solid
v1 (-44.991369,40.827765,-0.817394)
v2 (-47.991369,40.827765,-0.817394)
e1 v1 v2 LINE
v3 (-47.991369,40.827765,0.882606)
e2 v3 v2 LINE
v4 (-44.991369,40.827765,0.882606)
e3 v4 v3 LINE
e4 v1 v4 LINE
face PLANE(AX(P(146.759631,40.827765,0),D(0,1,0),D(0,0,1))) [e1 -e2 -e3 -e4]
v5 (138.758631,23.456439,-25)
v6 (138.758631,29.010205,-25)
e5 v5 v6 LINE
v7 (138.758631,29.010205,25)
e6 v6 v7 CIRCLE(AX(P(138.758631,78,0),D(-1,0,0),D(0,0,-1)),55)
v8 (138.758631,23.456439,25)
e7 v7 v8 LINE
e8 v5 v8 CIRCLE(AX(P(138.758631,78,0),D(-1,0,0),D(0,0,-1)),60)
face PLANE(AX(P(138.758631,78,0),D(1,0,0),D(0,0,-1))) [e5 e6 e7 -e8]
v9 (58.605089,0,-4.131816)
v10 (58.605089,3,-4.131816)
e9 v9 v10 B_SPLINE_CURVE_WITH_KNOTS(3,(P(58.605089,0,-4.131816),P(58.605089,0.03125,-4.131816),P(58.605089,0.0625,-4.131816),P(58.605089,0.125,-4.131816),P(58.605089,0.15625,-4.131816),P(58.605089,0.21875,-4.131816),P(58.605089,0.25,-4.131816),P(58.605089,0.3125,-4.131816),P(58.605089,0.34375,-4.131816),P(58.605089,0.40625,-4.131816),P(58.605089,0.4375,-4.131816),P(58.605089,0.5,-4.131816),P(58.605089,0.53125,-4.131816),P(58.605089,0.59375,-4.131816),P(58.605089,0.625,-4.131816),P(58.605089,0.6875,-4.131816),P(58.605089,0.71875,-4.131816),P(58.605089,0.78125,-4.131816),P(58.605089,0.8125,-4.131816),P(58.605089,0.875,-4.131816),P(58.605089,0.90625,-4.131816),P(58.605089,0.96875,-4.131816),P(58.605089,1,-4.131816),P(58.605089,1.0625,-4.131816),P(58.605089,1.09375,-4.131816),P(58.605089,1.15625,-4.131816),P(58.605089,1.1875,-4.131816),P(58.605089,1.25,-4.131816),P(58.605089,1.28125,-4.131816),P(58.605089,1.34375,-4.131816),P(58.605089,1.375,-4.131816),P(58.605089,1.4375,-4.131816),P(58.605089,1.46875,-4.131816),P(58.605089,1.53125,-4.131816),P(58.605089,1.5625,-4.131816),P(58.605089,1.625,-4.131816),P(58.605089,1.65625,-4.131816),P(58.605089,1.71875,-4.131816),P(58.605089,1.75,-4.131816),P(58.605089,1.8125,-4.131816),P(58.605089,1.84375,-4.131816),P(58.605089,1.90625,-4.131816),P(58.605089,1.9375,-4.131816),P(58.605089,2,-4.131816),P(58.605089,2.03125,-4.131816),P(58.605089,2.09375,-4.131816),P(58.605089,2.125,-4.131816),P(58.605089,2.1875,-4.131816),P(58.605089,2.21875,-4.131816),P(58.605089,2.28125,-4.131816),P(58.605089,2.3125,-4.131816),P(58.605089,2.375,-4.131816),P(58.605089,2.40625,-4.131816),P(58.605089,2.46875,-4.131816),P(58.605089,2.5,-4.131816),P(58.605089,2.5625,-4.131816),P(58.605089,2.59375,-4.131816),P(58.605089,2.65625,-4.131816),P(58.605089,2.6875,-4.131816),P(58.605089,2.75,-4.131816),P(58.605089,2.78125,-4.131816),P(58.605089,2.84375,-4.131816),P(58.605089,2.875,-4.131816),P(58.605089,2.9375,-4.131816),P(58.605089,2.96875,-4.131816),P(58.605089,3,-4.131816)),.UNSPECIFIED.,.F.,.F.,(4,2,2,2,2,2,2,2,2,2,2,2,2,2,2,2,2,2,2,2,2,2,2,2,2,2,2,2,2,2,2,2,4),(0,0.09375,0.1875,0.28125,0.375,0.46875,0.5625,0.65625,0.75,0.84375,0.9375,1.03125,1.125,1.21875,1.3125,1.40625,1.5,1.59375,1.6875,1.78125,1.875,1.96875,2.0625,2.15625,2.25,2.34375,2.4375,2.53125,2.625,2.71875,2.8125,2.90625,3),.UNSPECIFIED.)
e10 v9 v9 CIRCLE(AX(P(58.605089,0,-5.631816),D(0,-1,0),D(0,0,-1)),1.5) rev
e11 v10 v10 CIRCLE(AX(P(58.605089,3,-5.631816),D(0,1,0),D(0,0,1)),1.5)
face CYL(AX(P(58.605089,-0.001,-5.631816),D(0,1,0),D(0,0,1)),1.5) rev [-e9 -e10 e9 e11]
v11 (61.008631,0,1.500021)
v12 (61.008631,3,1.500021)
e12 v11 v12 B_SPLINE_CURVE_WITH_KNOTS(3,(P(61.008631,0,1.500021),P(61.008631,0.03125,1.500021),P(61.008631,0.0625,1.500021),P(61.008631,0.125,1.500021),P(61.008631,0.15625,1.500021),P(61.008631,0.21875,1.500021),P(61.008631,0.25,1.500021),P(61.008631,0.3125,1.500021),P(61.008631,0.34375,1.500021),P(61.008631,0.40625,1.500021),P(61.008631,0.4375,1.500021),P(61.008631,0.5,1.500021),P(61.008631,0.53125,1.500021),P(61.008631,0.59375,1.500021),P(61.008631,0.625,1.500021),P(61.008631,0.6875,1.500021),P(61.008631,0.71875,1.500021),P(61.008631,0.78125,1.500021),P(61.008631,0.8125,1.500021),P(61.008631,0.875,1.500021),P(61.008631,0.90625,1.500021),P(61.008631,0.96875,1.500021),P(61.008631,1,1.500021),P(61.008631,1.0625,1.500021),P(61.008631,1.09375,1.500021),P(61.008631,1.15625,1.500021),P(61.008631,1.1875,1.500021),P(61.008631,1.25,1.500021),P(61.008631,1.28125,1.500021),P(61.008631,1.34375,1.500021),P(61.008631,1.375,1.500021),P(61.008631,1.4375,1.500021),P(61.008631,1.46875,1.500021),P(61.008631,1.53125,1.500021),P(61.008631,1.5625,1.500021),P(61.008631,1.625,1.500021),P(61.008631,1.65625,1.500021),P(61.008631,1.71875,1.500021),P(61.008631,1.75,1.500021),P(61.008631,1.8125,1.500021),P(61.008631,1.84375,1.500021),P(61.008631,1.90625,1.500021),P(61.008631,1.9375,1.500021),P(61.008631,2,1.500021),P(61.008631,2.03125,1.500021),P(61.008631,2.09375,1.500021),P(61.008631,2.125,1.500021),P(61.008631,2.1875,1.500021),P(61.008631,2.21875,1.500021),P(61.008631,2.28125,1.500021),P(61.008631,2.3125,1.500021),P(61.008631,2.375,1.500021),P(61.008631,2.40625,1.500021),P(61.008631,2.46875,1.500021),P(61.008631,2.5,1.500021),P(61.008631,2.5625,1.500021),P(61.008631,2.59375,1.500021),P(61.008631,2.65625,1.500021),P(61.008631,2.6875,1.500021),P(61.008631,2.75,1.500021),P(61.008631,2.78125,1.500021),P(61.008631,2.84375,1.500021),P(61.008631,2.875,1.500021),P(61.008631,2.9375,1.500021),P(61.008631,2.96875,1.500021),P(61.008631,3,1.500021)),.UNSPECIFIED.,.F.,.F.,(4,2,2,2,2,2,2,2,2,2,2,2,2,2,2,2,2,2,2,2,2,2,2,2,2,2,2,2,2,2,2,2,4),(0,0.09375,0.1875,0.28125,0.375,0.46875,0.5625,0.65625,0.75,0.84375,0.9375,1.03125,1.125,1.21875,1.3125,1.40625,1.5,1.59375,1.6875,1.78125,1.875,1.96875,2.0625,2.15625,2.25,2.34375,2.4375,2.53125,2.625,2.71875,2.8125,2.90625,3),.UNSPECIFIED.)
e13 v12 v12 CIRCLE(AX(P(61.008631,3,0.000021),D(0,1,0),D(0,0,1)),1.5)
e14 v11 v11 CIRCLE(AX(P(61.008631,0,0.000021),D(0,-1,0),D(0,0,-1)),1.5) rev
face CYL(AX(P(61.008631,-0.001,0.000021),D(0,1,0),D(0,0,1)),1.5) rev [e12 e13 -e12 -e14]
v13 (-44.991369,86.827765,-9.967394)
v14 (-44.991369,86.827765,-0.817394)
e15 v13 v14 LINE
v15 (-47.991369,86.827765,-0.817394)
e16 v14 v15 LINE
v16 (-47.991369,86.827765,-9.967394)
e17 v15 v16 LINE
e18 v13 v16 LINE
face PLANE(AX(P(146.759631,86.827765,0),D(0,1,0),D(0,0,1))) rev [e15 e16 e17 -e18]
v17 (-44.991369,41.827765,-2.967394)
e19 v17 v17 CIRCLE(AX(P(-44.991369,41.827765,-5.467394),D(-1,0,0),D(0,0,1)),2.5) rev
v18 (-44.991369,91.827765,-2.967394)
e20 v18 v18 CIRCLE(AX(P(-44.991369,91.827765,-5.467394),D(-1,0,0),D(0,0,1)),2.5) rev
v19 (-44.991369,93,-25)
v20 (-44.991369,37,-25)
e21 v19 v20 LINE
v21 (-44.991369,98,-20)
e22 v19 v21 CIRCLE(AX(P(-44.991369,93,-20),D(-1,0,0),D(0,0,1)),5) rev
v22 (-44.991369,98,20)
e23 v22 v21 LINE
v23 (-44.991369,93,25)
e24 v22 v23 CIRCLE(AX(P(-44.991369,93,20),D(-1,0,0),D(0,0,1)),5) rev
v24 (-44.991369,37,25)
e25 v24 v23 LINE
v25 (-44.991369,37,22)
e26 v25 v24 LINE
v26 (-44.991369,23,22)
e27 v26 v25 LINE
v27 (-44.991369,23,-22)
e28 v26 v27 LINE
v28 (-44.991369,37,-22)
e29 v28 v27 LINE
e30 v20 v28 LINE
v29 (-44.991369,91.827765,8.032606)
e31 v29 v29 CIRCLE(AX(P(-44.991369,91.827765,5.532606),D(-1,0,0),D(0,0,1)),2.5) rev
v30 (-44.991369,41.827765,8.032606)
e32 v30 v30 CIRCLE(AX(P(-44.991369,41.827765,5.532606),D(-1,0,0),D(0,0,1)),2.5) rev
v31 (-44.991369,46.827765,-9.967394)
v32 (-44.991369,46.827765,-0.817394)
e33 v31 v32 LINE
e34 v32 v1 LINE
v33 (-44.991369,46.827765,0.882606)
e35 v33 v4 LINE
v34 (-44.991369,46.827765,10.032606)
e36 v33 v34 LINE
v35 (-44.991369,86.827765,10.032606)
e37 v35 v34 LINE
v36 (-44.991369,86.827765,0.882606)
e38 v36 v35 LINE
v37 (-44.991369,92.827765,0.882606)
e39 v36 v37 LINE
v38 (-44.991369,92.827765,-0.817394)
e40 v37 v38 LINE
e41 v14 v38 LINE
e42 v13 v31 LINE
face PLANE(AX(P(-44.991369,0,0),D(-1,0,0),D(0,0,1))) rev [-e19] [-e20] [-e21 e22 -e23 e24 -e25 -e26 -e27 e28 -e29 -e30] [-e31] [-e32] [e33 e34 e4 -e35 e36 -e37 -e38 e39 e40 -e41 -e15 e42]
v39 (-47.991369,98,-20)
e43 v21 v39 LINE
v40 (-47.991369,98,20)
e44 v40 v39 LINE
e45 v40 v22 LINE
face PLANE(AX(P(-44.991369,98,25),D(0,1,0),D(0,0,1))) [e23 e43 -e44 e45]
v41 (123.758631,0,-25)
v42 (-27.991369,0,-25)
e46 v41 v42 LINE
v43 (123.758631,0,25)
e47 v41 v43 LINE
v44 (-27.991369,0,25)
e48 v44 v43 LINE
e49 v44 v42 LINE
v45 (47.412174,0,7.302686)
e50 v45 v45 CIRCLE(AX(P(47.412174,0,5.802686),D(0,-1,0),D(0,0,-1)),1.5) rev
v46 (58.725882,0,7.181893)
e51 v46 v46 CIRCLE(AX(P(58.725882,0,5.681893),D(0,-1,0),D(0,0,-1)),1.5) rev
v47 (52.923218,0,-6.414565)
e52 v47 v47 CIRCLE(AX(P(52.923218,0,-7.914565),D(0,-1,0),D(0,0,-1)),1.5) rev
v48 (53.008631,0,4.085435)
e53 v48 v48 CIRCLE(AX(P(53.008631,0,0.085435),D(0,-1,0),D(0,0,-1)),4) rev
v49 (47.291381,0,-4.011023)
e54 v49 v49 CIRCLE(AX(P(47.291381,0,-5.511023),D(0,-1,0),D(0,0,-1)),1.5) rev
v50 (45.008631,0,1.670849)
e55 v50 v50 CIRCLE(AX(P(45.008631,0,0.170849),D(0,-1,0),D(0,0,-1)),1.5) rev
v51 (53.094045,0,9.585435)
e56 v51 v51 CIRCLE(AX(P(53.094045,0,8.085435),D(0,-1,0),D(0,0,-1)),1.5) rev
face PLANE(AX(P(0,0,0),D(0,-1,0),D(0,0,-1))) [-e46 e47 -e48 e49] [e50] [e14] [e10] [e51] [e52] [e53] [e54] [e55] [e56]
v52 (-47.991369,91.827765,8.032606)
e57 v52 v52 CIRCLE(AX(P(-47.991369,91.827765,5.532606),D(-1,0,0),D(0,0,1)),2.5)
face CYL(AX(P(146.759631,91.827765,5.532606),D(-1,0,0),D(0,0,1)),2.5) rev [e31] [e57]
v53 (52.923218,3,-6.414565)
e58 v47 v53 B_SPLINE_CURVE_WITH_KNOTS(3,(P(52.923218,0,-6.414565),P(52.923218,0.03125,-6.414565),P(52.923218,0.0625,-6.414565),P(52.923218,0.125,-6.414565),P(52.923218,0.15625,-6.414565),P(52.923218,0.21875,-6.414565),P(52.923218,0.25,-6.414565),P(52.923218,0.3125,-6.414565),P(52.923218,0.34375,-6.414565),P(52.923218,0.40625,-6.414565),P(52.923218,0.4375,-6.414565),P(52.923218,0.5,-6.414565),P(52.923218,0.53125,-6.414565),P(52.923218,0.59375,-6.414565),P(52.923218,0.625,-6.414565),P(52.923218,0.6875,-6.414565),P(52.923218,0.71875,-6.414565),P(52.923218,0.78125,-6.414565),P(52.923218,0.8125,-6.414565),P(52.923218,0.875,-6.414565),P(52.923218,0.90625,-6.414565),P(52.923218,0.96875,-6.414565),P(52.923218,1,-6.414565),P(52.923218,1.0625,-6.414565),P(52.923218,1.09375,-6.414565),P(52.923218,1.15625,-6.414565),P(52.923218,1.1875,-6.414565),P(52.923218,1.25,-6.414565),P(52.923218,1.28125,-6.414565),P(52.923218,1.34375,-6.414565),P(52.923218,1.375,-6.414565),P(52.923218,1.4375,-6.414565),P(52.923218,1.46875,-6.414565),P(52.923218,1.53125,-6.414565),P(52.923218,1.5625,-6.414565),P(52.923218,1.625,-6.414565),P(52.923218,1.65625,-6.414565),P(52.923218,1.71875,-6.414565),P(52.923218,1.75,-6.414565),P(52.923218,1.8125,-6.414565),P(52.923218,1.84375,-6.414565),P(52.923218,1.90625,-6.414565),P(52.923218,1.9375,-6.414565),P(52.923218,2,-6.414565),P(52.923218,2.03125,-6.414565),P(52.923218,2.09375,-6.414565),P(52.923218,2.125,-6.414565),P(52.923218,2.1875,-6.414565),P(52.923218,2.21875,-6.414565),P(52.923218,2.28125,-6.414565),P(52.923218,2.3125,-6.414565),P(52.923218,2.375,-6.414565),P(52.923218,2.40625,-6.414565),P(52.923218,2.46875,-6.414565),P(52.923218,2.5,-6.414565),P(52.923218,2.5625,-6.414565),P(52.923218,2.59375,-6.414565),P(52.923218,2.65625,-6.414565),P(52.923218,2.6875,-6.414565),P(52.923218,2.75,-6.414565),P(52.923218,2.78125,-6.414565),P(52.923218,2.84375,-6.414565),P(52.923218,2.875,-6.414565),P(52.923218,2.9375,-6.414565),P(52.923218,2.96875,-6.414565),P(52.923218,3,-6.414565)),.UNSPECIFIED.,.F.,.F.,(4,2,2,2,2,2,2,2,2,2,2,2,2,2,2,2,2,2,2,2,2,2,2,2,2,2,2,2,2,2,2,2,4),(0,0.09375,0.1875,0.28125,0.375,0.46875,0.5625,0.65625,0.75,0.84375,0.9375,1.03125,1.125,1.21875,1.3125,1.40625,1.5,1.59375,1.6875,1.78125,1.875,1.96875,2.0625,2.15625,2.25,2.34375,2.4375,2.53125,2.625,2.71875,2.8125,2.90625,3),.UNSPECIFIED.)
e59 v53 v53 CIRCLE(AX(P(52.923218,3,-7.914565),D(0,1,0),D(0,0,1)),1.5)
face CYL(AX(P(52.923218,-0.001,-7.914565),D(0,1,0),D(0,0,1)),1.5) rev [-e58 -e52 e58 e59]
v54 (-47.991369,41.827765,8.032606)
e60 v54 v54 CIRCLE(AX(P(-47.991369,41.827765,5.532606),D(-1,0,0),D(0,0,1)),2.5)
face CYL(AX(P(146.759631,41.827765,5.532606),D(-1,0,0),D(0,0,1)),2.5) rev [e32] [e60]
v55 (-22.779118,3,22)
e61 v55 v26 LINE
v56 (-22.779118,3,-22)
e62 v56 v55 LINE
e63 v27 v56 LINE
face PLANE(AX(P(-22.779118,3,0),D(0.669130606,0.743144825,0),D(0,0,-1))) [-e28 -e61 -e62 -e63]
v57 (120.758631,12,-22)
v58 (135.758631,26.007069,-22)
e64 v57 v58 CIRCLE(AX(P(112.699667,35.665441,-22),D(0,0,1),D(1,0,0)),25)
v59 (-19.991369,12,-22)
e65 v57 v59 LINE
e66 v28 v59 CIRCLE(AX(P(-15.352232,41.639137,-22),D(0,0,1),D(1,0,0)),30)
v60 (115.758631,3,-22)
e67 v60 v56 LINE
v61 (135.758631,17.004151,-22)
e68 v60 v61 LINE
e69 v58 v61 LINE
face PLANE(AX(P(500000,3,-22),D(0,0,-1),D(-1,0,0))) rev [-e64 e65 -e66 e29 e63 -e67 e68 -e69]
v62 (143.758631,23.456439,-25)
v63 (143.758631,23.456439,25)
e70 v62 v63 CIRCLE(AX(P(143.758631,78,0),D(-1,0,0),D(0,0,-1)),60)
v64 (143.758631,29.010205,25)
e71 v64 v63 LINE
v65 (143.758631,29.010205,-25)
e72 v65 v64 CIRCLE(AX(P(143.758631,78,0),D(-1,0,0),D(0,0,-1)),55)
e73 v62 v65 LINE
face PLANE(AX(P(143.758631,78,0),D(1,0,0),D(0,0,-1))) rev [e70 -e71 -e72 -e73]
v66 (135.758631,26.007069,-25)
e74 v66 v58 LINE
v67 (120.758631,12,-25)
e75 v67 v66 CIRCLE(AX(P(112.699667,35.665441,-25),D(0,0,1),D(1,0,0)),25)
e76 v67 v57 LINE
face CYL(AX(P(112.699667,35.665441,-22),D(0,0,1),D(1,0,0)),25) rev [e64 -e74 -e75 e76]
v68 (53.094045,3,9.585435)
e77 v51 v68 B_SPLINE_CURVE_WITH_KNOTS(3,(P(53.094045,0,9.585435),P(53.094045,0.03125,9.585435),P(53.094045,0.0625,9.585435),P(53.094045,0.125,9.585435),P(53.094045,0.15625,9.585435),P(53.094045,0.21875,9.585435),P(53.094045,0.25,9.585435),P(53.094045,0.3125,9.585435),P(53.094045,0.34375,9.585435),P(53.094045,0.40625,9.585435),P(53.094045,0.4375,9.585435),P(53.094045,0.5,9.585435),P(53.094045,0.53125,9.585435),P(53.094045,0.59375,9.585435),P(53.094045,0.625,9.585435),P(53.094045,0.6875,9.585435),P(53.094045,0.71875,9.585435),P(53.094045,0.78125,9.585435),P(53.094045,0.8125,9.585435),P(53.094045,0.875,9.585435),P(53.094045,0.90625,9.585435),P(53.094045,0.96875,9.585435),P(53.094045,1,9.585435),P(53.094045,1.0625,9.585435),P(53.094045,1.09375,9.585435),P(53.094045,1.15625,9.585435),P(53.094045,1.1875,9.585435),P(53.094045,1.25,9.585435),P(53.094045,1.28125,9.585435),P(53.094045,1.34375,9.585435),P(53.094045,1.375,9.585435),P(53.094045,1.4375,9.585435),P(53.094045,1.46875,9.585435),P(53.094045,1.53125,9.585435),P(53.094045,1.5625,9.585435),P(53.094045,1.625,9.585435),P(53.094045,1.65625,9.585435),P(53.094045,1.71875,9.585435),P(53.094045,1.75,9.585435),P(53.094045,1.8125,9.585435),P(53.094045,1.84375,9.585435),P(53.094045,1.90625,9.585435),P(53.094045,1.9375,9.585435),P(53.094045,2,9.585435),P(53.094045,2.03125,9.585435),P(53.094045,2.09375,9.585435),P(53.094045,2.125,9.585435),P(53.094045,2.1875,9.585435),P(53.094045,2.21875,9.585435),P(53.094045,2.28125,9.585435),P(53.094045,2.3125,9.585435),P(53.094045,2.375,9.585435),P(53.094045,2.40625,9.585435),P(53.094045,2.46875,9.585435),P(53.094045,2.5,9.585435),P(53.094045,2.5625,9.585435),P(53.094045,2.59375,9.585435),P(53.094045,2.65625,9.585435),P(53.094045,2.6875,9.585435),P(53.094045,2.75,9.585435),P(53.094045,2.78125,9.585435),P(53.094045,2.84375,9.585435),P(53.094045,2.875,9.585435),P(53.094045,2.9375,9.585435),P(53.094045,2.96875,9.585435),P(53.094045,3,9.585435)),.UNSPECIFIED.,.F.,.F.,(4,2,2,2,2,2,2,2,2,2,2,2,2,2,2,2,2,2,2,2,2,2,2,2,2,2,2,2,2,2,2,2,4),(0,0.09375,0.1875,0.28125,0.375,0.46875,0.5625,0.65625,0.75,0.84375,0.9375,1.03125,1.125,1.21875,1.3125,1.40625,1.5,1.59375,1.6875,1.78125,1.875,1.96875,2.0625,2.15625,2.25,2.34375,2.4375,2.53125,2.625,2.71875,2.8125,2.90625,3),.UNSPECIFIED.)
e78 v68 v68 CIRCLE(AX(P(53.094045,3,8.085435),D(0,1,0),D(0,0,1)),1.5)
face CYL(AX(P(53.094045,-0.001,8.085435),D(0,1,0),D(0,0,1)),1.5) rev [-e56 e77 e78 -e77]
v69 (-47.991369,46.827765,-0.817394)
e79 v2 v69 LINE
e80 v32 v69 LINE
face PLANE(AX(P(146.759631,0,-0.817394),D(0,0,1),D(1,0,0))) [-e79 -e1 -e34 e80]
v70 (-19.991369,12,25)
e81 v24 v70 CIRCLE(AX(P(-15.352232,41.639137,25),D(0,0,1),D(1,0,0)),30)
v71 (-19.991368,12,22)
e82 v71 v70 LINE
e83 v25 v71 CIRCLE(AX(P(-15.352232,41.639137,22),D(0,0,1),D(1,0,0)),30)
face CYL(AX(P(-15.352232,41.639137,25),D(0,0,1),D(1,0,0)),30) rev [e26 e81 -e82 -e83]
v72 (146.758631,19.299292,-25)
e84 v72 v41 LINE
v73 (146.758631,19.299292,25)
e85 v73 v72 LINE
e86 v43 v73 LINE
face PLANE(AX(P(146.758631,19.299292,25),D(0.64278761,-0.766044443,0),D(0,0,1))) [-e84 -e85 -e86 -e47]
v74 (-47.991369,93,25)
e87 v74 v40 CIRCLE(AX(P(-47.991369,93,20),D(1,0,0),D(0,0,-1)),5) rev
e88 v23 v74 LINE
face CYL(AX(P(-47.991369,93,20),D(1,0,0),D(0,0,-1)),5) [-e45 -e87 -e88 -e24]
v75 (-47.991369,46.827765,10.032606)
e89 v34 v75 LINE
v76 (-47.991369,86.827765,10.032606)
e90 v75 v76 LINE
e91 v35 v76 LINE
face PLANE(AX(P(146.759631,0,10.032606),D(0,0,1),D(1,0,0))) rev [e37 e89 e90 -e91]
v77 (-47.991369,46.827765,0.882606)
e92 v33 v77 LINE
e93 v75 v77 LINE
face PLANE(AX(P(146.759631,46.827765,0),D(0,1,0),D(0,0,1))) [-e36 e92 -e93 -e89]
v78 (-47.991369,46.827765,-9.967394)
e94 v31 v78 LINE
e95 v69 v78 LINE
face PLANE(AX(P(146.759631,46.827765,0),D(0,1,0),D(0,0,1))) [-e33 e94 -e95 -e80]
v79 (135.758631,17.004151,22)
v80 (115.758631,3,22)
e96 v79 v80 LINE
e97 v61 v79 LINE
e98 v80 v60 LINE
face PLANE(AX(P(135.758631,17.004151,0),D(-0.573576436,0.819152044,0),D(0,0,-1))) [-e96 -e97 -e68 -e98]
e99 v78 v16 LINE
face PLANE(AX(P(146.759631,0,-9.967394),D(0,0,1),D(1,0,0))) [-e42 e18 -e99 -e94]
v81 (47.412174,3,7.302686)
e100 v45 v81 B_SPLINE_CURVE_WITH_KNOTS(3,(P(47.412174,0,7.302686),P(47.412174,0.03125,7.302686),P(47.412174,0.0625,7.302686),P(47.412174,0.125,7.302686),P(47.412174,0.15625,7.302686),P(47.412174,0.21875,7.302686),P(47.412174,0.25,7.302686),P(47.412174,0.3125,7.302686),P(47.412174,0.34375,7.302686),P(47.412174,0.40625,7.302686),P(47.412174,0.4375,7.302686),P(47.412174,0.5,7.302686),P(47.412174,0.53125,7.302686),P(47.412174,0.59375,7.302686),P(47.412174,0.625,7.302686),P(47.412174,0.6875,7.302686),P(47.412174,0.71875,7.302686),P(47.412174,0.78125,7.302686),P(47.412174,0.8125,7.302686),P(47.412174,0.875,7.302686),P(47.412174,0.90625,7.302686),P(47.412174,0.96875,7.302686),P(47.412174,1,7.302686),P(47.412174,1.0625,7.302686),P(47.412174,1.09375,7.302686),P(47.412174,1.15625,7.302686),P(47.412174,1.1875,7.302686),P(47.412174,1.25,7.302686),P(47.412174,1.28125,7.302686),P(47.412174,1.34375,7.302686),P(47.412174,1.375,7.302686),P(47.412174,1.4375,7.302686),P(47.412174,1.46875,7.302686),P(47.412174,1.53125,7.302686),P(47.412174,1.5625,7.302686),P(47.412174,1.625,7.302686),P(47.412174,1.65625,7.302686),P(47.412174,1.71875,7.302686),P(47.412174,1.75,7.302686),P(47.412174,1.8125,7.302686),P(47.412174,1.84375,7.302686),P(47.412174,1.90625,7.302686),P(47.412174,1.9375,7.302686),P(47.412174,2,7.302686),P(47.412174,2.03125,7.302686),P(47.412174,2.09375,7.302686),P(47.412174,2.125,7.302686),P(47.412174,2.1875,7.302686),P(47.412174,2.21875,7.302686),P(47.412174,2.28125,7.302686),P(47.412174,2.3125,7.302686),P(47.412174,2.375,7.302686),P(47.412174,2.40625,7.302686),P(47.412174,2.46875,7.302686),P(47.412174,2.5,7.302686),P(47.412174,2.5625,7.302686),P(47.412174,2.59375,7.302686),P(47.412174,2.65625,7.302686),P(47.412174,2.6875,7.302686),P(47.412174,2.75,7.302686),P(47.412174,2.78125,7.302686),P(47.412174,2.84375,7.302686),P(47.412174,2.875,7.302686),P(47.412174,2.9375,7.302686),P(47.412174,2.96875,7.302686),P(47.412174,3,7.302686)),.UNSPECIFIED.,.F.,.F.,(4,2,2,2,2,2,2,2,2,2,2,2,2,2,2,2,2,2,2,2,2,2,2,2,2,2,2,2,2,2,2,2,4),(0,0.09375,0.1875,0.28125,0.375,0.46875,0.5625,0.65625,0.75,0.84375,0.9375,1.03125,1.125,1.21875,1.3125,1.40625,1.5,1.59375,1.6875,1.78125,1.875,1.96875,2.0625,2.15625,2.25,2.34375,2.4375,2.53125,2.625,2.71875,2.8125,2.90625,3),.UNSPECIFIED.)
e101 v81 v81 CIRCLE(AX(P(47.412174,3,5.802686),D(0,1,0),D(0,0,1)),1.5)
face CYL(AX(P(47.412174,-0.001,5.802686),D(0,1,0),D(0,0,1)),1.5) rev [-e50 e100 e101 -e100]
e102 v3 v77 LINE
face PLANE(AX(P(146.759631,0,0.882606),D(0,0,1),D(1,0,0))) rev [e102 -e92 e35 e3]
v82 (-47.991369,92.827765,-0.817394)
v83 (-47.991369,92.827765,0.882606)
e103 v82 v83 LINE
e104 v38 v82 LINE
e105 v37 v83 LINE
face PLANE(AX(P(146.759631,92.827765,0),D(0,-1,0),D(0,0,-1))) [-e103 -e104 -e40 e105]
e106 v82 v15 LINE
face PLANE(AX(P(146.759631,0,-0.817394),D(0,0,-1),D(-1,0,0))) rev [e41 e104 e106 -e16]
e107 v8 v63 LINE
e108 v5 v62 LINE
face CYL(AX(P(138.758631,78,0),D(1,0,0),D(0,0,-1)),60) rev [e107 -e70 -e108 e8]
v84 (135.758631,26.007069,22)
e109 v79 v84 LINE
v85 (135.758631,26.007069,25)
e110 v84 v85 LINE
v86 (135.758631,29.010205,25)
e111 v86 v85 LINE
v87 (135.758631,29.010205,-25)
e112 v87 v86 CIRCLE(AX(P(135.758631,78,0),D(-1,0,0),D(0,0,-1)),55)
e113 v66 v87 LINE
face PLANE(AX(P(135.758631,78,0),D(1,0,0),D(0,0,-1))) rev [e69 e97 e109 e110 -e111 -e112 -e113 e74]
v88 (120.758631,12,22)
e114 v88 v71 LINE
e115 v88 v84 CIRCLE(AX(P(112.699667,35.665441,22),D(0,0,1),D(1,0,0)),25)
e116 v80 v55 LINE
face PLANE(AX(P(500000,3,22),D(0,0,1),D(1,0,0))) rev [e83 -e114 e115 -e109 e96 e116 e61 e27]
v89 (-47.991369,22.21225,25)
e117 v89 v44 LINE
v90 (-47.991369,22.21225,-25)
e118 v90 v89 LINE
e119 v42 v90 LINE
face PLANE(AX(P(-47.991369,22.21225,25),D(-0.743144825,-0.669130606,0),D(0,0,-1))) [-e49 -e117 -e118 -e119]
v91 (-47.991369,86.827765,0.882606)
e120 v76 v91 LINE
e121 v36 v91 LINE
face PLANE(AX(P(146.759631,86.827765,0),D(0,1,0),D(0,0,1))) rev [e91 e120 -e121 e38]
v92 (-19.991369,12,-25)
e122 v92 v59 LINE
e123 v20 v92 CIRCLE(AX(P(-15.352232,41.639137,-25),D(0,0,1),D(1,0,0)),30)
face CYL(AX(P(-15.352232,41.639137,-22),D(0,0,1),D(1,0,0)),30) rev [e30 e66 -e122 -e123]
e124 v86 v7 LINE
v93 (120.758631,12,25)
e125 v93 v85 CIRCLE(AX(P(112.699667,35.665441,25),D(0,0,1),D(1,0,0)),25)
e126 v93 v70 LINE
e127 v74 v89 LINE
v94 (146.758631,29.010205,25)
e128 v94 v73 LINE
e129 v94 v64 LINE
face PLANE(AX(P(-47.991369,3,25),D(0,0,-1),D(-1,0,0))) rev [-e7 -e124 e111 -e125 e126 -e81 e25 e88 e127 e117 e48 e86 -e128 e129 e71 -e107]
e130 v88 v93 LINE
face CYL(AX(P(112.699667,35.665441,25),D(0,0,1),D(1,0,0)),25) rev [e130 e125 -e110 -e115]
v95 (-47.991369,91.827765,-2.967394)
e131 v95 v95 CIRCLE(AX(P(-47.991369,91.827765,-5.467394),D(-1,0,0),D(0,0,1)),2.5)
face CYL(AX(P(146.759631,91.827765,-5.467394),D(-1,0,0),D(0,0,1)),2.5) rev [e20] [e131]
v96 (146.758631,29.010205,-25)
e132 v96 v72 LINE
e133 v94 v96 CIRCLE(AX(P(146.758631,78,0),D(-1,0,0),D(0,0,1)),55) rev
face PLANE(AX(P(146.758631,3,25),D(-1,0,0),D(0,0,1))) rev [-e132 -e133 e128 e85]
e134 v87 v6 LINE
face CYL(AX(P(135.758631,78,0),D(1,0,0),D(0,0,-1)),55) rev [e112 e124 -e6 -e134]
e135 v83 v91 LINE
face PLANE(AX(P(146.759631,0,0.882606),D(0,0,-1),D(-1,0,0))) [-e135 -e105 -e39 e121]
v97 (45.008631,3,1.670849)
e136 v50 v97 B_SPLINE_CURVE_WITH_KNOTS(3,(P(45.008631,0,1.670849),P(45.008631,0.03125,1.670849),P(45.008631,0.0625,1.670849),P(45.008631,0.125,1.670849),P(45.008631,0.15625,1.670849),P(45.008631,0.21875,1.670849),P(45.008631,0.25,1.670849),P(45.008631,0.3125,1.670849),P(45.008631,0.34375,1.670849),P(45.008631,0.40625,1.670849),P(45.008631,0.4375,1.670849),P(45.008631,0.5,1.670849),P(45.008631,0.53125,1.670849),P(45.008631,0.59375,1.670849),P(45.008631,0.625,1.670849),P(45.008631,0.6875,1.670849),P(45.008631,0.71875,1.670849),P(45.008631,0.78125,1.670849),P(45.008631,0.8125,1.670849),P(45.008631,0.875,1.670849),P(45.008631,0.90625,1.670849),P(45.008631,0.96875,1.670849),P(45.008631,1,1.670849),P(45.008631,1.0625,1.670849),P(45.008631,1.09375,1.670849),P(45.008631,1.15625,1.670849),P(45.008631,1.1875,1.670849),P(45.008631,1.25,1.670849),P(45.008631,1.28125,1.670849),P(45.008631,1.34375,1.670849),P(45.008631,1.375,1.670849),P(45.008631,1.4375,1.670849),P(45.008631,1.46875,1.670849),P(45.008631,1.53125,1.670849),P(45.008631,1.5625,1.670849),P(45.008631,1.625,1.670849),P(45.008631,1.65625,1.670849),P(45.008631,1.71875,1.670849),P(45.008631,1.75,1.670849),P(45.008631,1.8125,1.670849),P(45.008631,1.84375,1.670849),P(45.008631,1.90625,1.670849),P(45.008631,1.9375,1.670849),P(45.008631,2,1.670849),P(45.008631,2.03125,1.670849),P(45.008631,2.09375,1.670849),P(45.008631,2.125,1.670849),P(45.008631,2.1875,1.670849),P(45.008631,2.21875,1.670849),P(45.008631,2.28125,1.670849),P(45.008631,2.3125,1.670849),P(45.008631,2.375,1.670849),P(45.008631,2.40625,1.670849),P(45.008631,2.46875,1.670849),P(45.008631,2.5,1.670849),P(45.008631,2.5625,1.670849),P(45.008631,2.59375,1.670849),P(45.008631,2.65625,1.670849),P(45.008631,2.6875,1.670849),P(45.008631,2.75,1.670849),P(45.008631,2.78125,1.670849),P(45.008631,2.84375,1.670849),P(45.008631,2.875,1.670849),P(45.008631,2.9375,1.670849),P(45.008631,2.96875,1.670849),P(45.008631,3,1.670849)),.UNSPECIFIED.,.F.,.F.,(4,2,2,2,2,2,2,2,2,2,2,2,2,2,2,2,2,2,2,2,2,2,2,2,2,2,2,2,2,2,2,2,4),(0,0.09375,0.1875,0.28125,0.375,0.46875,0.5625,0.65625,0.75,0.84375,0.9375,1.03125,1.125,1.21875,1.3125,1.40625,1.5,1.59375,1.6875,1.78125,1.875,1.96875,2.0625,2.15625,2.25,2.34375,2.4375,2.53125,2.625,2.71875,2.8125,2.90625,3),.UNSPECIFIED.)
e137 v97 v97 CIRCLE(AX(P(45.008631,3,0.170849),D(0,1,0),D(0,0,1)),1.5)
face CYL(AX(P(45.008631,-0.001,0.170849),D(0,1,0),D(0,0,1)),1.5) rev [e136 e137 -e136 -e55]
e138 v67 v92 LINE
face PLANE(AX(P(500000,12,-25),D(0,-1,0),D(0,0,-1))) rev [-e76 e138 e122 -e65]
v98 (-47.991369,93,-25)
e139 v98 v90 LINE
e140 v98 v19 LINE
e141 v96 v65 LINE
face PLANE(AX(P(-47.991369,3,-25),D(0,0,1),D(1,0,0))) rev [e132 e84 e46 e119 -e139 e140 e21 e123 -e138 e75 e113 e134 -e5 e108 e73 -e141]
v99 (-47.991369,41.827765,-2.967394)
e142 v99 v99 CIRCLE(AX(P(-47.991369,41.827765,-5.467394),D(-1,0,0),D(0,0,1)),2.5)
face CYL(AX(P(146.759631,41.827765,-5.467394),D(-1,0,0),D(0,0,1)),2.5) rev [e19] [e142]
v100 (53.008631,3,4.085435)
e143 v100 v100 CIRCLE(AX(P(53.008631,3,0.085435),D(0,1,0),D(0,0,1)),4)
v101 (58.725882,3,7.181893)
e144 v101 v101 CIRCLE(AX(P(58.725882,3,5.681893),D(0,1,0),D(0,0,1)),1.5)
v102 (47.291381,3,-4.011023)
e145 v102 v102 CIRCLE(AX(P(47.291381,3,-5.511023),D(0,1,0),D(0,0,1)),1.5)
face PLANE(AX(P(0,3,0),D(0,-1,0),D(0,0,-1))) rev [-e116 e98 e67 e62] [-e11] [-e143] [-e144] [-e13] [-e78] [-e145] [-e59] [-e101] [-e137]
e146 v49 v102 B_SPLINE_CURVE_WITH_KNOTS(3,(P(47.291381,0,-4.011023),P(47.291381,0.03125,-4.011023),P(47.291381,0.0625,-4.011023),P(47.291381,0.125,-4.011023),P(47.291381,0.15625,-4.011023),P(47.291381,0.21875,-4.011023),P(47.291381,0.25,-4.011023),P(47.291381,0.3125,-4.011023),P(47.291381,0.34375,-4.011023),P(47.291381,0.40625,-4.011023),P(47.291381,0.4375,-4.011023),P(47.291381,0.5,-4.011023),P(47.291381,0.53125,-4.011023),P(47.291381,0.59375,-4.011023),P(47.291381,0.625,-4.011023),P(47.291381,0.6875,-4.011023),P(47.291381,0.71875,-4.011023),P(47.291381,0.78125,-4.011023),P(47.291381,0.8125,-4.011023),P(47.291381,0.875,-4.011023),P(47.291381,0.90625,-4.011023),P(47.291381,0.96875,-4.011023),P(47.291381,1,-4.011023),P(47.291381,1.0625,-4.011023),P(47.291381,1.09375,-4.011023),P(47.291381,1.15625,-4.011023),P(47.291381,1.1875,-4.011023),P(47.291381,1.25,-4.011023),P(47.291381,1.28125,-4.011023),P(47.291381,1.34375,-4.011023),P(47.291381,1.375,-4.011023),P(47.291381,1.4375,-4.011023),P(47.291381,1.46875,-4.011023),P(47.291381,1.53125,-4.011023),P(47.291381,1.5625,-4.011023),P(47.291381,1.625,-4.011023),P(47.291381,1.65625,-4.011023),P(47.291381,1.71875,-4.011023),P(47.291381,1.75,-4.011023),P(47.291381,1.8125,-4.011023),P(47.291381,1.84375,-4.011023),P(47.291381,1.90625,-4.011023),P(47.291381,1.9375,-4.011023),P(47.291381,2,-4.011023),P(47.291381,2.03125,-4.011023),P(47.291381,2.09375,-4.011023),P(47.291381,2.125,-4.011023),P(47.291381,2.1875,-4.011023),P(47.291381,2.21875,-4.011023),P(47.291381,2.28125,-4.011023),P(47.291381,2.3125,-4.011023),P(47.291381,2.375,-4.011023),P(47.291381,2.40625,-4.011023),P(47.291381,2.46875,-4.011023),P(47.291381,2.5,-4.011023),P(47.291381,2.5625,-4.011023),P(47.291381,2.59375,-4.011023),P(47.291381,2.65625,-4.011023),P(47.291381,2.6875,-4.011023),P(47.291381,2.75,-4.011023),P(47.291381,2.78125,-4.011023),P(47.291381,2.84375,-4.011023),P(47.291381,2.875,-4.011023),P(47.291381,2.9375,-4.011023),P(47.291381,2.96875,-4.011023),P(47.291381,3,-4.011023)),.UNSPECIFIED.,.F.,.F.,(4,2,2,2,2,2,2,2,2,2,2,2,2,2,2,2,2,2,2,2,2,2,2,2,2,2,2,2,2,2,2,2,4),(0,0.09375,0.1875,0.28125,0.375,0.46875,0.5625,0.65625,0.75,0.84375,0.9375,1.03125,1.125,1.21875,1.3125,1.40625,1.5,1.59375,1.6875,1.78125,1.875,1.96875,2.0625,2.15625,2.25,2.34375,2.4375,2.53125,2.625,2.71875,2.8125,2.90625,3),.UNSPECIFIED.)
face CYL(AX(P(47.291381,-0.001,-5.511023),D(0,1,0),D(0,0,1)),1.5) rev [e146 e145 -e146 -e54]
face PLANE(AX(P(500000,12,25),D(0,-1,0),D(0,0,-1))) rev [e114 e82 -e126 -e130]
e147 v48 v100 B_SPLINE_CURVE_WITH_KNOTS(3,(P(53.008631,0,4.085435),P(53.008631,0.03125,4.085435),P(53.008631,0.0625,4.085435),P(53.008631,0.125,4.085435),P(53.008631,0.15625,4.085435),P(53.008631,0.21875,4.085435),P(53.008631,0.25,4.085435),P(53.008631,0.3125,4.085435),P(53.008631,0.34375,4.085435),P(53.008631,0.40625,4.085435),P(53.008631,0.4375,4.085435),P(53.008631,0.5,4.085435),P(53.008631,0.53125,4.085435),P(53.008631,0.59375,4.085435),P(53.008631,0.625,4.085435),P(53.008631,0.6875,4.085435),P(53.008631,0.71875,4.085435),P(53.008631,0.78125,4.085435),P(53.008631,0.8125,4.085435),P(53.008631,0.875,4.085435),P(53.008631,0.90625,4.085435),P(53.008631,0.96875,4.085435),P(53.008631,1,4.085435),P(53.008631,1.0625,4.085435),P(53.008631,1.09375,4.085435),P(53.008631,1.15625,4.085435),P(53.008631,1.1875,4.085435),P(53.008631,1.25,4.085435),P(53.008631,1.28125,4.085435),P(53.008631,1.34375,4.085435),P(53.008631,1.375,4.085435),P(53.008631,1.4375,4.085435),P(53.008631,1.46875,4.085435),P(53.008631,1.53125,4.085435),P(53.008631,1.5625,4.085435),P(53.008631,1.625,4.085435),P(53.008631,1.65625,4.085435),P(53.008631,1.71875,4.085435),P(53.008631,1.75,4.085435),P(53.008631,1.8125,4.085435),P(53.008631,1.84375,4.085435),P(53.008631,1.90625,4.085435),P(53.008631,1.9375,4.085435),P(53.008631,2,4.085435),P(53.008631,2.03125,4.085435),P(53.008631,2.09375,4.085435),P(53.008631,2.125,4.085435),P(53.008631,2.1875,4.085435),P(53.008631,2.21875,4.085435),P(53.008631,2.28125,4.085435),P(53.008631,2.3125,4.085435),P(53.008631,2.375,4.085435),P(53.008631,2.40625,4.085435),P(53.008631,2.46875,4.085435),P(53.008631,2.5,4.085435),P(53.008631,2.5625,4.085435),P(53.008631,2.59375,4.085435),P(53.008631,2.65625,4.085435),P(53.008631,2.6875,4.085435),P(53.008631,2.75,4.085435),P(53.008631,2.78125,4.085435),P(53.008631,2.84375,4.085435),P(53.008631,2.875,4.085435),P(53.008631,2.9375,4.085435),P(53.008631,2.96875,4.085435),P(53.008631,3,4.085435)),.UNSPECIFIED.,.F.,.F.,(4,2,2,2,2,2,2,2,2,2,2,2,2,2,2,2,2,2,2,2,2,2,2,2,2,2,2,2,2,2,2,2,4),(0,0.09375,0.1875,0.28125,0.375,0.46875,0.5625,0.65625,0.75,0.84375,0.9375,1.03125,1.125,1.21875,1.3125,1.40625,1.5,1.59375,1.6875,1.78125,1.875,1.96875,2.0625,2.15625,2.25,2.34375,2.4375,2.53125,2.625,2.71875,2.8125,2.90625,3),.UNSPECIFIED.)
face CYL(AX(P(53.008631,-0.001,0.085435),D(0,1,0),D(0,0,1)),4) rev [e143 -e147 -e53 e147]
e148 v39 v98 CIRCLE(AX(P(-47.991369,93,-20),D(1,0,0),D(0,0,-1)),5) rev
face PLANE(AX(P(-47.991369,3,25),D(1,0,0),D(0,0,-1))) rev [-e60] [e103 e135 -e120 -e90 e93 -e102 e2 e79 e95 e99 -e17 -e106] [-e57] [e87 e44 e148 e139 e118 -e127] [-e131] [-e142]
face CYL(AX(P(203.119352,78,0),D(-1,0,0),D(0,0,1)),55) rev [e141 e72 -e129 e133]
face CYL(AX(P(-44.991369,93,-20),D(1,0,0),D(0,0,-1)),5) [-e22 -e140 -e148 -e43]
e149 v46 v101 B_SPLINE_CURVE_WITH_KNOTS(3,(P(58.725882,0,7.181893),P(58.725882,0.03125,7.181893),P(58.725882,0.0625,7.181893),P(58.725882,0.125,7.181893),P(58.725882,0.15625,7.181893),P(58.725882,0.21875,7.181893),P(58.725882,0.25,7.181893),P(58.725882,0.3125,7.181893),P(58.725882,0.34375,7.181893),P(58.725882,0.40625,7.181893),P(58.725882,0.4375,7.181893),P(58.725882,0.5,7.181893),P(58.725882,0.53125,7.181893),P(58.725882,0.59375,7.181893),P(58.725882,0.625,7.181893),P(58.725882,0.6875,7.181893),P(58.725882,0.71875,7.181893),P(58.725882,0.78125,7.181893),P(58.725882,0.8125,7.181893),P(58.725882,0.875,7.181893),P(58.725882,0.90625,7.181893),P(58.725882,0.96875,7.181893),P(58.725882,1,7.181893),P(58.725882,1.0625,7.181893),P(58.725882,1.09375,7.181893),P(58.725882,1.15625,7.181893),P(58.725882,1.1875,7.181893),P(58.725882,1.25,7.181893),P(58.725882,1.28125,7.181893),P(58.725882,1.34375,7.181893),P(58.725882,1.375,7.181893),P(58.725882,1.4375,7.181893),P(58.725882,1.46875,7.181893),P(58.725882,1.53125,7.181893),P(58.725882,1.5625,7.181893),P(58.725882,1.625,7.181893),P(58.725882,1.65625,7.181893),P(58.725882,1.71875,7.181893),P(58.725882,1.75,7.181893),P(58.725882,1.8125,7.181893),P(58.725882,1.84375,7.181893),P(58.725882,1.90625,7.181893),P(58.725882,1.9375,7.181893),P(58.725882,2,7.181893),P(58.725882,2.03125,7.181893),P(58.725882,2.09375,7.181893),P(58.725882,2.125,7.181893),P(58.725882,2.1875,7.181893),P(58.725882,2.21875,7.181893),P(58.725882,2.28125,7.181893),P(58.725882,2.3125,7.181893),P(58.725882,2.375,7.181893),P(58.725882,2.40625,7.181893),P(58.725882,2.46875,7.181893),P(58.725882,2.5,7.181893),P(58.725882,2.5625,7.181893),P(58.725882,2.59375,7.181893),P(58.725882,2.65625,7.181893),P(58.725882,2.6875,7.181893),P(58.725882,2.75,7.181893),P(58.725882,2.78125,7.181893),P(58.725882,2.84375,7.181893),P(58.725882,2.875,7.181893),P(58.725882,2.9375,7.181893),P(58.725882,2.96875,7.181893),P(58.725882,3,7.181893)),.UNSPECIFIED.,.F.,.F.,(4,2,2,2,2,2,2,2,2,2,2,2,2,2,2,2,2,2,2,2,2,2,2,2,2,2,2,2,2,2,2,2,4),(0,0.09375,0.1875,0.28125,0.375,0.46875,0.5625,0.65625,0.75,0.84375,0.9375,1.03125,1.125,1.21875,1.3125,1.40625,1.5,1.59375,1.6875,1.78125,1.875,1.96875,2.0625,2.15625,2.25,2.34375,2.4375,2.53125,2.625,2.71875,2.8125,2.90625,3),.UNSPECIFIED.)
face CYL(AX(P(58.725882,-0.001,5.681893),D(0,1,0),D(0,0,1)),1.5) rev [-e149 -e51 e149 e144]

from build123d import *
from OCP.BRepFilletAPI import BRepFilletAPI_MakeChamfer

# Parameters (mm, degrees)
SKETCH1_W           = 194.75
SKETCH1_H           = 50
BOSS_EXTRUDE1_DEPTH = 3
BOSS_EXTRUDE2_START = -3
BOSS_EXTRUDE2_DEPTH = 5
BOSS_EXTRUDE3_DEPTH = 3
BOSS_EXTRUDE4_START = -3
BOSS_EXTRUDE4_DEPTH = 3
SKETCH6_W           = 50
SKETCH6_H           = 95
BOSS_EXTRUDE5_DEPTH = 3
BOSS_EXTRUDE6_REACH = 218.788
SKETCH7_W           = 3
SKETCH7_H           = 9
RIB1_START          = -3
RIB1_DEPTH          = 3
LPATTERN1_COUNT     = 2
LPATTERN1_PITCH     = 47
RIB2_START          = -3
RIB2_DEPTH          = 3
LPATTERN2_COUNT     = 2
LPATTERN2_PITCH     = 47
CUT_EXTRUDE1_REACH  = 178.602
SKETCH10_R          = 4
SKETCH10_R_2        = 1.5
FILLET1_R           = 5
CHAMFER1_SIZE       = 20
CHAMFER1_SIZE2      = 22.212250297
CHAMFER2_SIZE       = 20
CHAMFER2_SIZE2      = 14.004150764
CHAMFER3_SIZE       = 23
CHAMFER3_SIZE2      = 19.299291517
CUT_EXTRUDE2_REACH  = 221.446
SKETCH11_W          = 1.7
SKETCH11_H          = 6
SKETCH11_R          = 2.5


# Read off the part's stored shape, not the designer's step: Rib1, Rib2
with BuildPart() as part:
    # Sketch1 → Boss-Extrude1 (new body)
    with BuildSketch(Plane(origin=(0, 0, 0), x_dir=(1, 0, 0), z_dir=(0, 1, 0))):
        with Locations((49.3836315, 0)):
            Rectangle(SKETCH1_W, SKETCH1_H)
    extrude(amount=BOSS_EXTRUDE1_DEPTH)

    # Sketch2 → Boss-Extrude2 (add)
    with BuildSketch(Plane(origin=(146.7586315, 0, 0), x_dir=(0, 0, -1), z_dir=(1, 0, 0)).offset(BOSS_EXTRUDE2_START)):
        with BuildLine():
            Line((25, 3), (25, 23.456439427))
            ThreePointArc((25, 23.456439427), (0, 18), (-25, 23.456439427))
            Line((-25, 23.456439427), (-25, 3))
            Line((-25, 3), (25, 3))
        make_face()
    extrude(amount=-BOSS_EXTRUDE2_DEPTH)

    # Sketch3 → Boss-Extrude3 (add)
    with BuildSketch(Plane(origin=(143.7586315, 0, 0), x_dir=(0, 0, -1), z_dir=(1, 0, 0))):
        with BuildLine():
            Line((-25, 3), (25, 3))
            Line((25, 3), (25, 29.010205144))
            ThreePointArc((25, 29.010205144), (0, 23), (-25, 29.010205144))
            Line((-25, 29.010205144), (-25, 3))
        make_face()
    extrude(amount=BOSS_EXTRUDE3_DEPTH)

    # Sketch4 → Boss-Extrude4 (add)
    with BuildSketch(Plane(origin=(138.7586315, 0, 0), x_dir=(0, 0, -1), z_dir=(1, 0, 0)).offset(BOSS_EXTRUDE4_START)):
        with BuildLine():
            Line((-25, 0), (-25, 29.010205144))
            ThreePointArc((-25, 29.010205144), (0, 23), (25, 29.010205144))
            Line((25, 29.010205144), (25, 0))
            Line((25, 0), (-25, 0))
        make_face()
    extrude(amount=BOSS_EXTRUDE4_DEPTH)

    # Sketch6 → Boss-Extrude5 (add)
    with BuildSketch(Plane.ZY.offset(47.9913685)):
        with Locations((0, 50.5)):
            Rectangle(SKETCH6_W, SKETCH6_H)
    extrude(amount=-BOSS_EXTRUDE5_DEPTH)

    # Sketch7 → Boss-Extrude6 (add, up to next)
    with BuildSketch(Plane(origin=(-44.9913685, 0, 0), x_dir=(0, 0, -1), z_dir=(1, 0, 0)), mode=Mode.PRIVATE) as boss_extrude6_sk1:
        with Locations((-23.5, 7.5)):
            Rectangle(SKETCH7_W, SKETCH7_H)
    boss_extrude6_tool1 = extrude(boss_extrude6_sk1.sketch, amount=BOSS_EXTRUDE6_REACH, mode=Mode.PRIVATE) - part.part
    # Sketch7 → Boss-Extrude6 (add, up to next)
    with BuildSketch(Plane(origin=(-44.9913685, 0, 0), x_dir=(0, 0, -1), z_dir=(1, 0, 0)), mode=Mode.PRIVATE) as boss_extrude6_sk2:
        with Locations((23.5, 7.5)):
            Rectangle(SKETCH7_W, SKETCH7_H)
    boss_extrude6_tool2 = extrude(boss_extrude6_sk2.sketch, amount=BOSS_EXTRUDE6_REACH, mode=Mode.PRIVATE) - part.part
    add(boss_extrude6_tool1.solids().sort_by_distance((-44.991369, 7.5, 23.5))[0])
    add(boss_extrude6_tool2.solids().sort_by_distance((-44.991369, 7.5, -23.5))[0])

    # Rib1 outline → Rib1 (add)
    with BuildSketch(Plane.XY.offset(25).offset(RIB1_START)):
        with BuildLine():
            ThreePointArc((-19.991368497, 11.999999999), (-36.565435434, 20.425933064), (-44.9913685, 37))
            Line((-44.9913685, 37), (-44.9913685, 12))
            Line((-44.9913685, 12), (-19.991368497, 11.999999999))
        make_face()
    rib1 = extrude(amount=RIB1_DEPTH)

    # LPattern1: Rib1 ×2
    with Locations(*[(0, 0, -i * LPATTERN1_PITCH) for i in range(1, LPATTERN1_COUNT)]):
        add(rib1)

    # Rib2 outline → Rib2 (add)
    with BuildSketch(Plane.XY.offset(25).offset(RIB2_START)):
        with BuildLine():
            ThreePointArc((135.7586315, 26.007069295), (129.762224626, 17.393355072), (120.7586315, 12))
            Line((120.7586315, 12), (135.7586315, 12))
            Line((135.7586315, 12), (135.7586315, 26.007069295))
        make_face()
    rib2 = extrude(amount=RIB2_DEPTH)

    # LPattern2: Rib2 ×2
    with Locations(*[(0, 0, -i * LPATTERN2_PITCH) for i in range(1, LPATTERN2_COUNT)]):
        add(rib2)

    # Sketch10 → Cut-Extrude1 (cut, up to next)
    with BuildSketch(Plane(origin=(0, 3, 0), x_dir=(1, 0, 0), z_dir=(0, 1, 0)), mode=Mode.PRIVATE) as cut_extrude1_sk1:
        with Locations(Location((53.0086315, -0.085435095, 0), (0, 0, 270))):
            Circle(SKETCH10_R)
    cut_extrude1_tool1 = extrude(cut_extrude1_sk1.sketch, amount=-CUT_EXTRUDE1_REACH, mode=Mode.PRIVATE) & part.part
    # Sketch10 → Cut-Extrude1 (cut, up to next)
    with BuildSketch(Plane(origin=(0, 3, 0), x_dir=(1, 0, 0), z_dir=(0, 1, 0)), mode=Mode.PRIVATE) as cut_extrude1_sk2:
        with Locations(Location((61.0086315, -2.1452e-05, 0), (0, 0, 270))):
            Circle(SKETCH10_R_2)
    cut_extrude1_tool2 = extrude(cut_extrude1_sk2.sketch, amount=-CUT_EXTRUDE1_REACH, mode=Mode.PRIVATE) & part.part
    # Sketch10 → Cut-Extrude1 (cut, up to next)
    with BuildSketch(Plane(origin=(0, 3, 0), x_dir=(1, 0, 0), z_dir=(0, 1, 0)), mode=Mode.PRIVATE) as cut_extrude1_sk3:
        with Locations(Location((58.725882315, -5.681892778, 0), (0, 0, 270))):
            Circle(SKETCH10_R_2)
    cut_extrude1_tool3 = extrude(cut_extrude1_sk3.sketch, amount=-CUT_EXTRUDE1_REACH, mode=Mode.PRIVATE) & part.part
    # Sketch10 → Cut-Extrude1 (cut, up to next)
    with BuildSketch(Plane(origin=(0, 3, 0), x_dir=(1, 0, 0), z_dir=(0, 1, 0)), mode=Mode.PRIVATE) as cut_extrude1_sk4:
        with Locations(Location((53.094045142, -8.085435095, 0), (0, 0, 270))):
            Circle(SKETCH10_R_2)
    cut_extrude1_tool4 = extrude(cut_extrude1_sk4.sketch, amount=-CUT_EXTRUDE1_REACH, mode=Mode.PRIVATE) & part.part
    # Sketch10 → Cut-Extrude1 (cut, up to next)
    with BuildSketch(Plane(origin=(0, 3, 0), x_dir=(1, 0, 0), z_dir=(0, 1, 0)), mode=Mode.PRIVATE) as cut_extrude1_sk5:
        with Locations(Location((47.412173816, -5.80268591, 0), (0, 0, 270))):
            Circle(SKETCH10_R_2)
    cut_extrude1_tool5 = extrude(cut_extrude1_sk5.sketch, amount=-CUT_EXTRUDE1_REACH, mode=Mode.PRIVATE) & part.part
    # Sketch10 → Cut-Extrude1 (cut, up to next)
    with BuildSketch(Plane(origin=(0, 3, 0), x_dir=(1, 0, 0), z_dir=(0, 1, 0)), mode=Mode.PRIVATE) as cut_extrude1_sk6:
        with Locations(Location((45.0086315, -0.170848737, 0), (0, 0, 270))):
            Circle(SKETCH10_R_2)
    cut_extrude1_tool6 = extrude(cut_extrude1_sk6.sketch, amount=-CUT_EXTRUDE1_REACH, mode=Mode.PRIVATE) & part.part
    # Sketch10 → Cut-Extrude1 (cut, up to next)
    with BuildSketch(Plane(origin=(0, 3, 0), x_dir=(1, 0, 0), z_dir=(0, 1, 0)), mode=Mode.PRIVATE) as cut_extrude1_sk7:
        with Locations(Location((47.291380684, 5.511022589, 0), (0, 0, 270))):
            Circle(SKETCH10_R_2)
    cut_extrude1_tool7 = extrude(cut_extrude1_sk7.sketch, amount=-CUT_EXTRUDE1_REACH, mode=Mode.PRIVATE) & part.part
    # Sketch10 → Cut-Extrude1 (cut, up to next)
    with BuildSketch(Plane(origin=(0, 3, 0), x_dir=(1, 0, 0), z_dir=(0, 1, 0)), mode=Mode.PRIVATE) as cut_extrude1_sk8:
        with Locations(Location((52.923217857, 7.914564905, 0), (0, 0, 270))):
            Circle(SKETCH10_R_2)
    cut_extrude1_tool8 = extrude(cut_extrude1_sk8.sketch, amount=-CUT_EXTRUDE1_REACH, mode=Mode.PRIVATE) & part.part
    # Sketch10 → Cut-Extrude1 (cut, up to next)
    with BuildSketch(Plane(origin=(0, 3, 0), x_dir=(1, 0, 0), z_dir=(0, 1, 0)), mode=Mode.PRIVATE) as cut_extrude1_sk9:
        with Locations(Location((58.605089183, 5.631815721, 0), (0, 0, 270))):
            Circle(SKETCH10_R_2)
    cut_extrude1_tool9 = extrude(cut_extrude1_sk9.sketch, amount=-CUT_EXTRUDE1_REACH, mode=Mode.PRIVATE) & part.part
    add(cut_extrude1_tool1.solids().sort_by_distance((53.008631, 3, 0.085435))[0], mode=Mode.SUBTRACT)
    add(cut_extrude1_tool2.solids().sort_by_distance((61.008631, 3, 2.1e-05))[0], mode=Mode.SUBTRACT)
    add(cut_extrude1_tool3.solids().sort_by_distance((58.725882, 3, 5.681893))[0], mode=Mode.SUBTRACT)
    add(cut_extrude1_tool4.solids().sort_by_distance((53.094045, 3, 8.085435))[0], mode=Mode.SUBTRACT)
    add(cut_extrude1_tool5.solids().sort_by_distance((47.412174, 3, 5.802686))[0], mode=Mode.SUBTRACT)
    add(cut_extrude1_tool6.solids().sort_by_distance((45.008631, 3, 0.170849))[0], mode=Mode.SUBTRACT)
    add(cut_extrude1_tool7.solids().sort_by_distance((47.291381, 3, -5.511023))[0], mode=Mode.SUBTRACT)
    add(cut_extrude1_tool8.solids().sort_by_distance((52.923218, 3, -7.914565))[0], mode=Mode.SUBTRACT)
    add(cut_extrude1_tool9.solids().sort_by_distance((58.605089, 3, -5.631816))[0], mode=Mode.SUBTRACT)

    # Fillet1
    fillet1_edges = [part.edges().sort_by_distance(p)[0] for p in [
        (-46.4913685, 98, 25),
        (-46.4913685, 98, -25),
    ]]
    fillet(fillet1_edges, radius=FILLET1_R)

    # Chamfer1: one chamfer whose edges measure the first distance from different faces: ONE call of the kernel's chamfer builder (chamfer() names one face for all edges)
    chamfer1_edges_1 = [part.edges().sort_by_distance(p)[0] for p in [
        (-47.9913685, 0, 0),
    ]]
    chamfer1_side_1 = [part.faces().sort_by_distance(p)[0] for p in [
        (-45.98070785, 0, 0),
    ]]
    chamfer1_edges_2 = [part.edges().sort_by_distance(p)[0] for p in [
        (-44.9913685, 3, 0),
    ]]
    chamfer1_side_2 = [part.faces().sort_by_distance(p)[0] for p in [
        (-44.9913685, 51.76217503, 0),
    ]]
    chamfer1 = BRepFilletAPI_MakeChamfer(part.part.solid().wrapped)
    for e in chamfer1_edges_1:
        chamfer1.Add(CHAMFER1_SIZE, CHAMFER1_SIZE2, e.wrapped, chamfer1_side_1[0].wrapped)  # the first distance lies on this face
    for e in chamfer1_edges_2:
        chamfer1.Add(CHAMFER1_SIZE, CHAMFER1_SIZE2, e.wrapped, chamfer1_side_2[0].wrapped)  # the first distance lies on this face
    add(Compound.cast(chamfer1.Shape()), mode=Mode.REPLACE)

    # Chamfer2
    chamfer2_edges = [part.edges().sort_by_distance(p)[0] for p in [
        (135.7586315, 3, 0),
    ]]
    chamfer2_side = [part.faces().sort_by_distance(p)[0] for p in [
        (56.489756648, 3, -20.354697047),
    ]]
    chamfer(chamfer2_edges, length=CHAMFER2_SIZE, length2=CHAMFER2_SIZE2, reference=chamfer2_side[0])

    # Chamfer3
    chamfer3_edges = [part.edges().sort_by_distance(p)[0] for p in [
        (146.7586315, 0, 0),
    ]]
    chamfer3_side = [part.faces().sort_by_distance(p)[0] for p in [
        (59.462529077, 0, -0.001057352),
    ]]
    chamfer(chamfer3_edges, length=CHAMFER3_SIZE, length2=CHAMFER3_SIZE2, reference=chamfer3_side[0])

    # Sketch11 → Cut-Extrude2 (cut, up to next)
    with BuildSketch(Plane.ZY.offset(47.9913685), mode=Mode.PRIVATE) as cut_extrude2_sk1:
        with Locations((0.032606221, 89.827764741)):
            Rectangle(SKETCH11_W, SKETCH11_H)
    cut_extrude2_tool1 = extrude(cut_extrude2_sk1.sketch, amount=-CUT_EXTRUDE2_REACH, mode=Mode.PRIVATE) & part.part
    # Sketch11 → Cut-Extrude2 (cut, up to next)
    with BuildSketch(Plane.ZY.offset(47.9913685), mode=Mode.PRIVATE) as cut_extrude2_sk2:
        Polygon((0.882606221, 86.827764741), (-0.817393779, 86.827764741), (-9.967393779, 86.827764741), (-9.967393779, 46.827764741), (-0.817393779, 46.827764741), (0.882606221, 46.827764741), (10.032606221, 46.827764741), (10.032606221, 86.827764741), align=None)
    cut_extrude2_tool2 = extrude(cut_extrude2_sk2.sketch, amount=-CUT_EXTRUDE2_REACH, mode=Mode.PRIVATE) & part.part
    # Sketch11 → Cut-Extrude2 (cut, up to next)
    with BuildSketch(Plane.ZY.offset(47.9913685), mode=Mode.PRIVATE) as cut_extrude2_sk3:
        with Locations((-5.467393779, 91.827764741)):
            Circle(SKETCH11_R)
    cut_extrude2_tool3 = extrude(cut_extrude2_sk3.sketch, amount=-CUT_EXTRUDE2_REACH, mode=Mode.PRIVATE) & part.part
    # Sketch11 → Cut-Extrude2 (cut, up to next)
    with BuildSketch(Plane.ZY.offset(47.9913685), mode=Mode.PRIVATE) as cut_extrude2_sk4:
        with Locations((5.532606221, 91.827764741)):
            Circle(SKETCH11_R)
    cut_extrude2_tool4 = extrude(cut_extrude2_sk4.sketch, amount=-CUT_EXTRUDE2_REACH, mode=Mode.PRIVATE) & part.part
    # Sketch11 → Cut-Extrude2 (cut, up to next)
    with BuildSketch(Plane.ZY.offset(47.9913685), mode=Mode.PRIVATE) as cut_extrude2_sk5:
        with Locations((0.032606221, 43.827764741)):
            Rectangle(SKETCH11_W, SKETCH11_H)
    cut_extrude2_tool5 = extrude(cut_extrude2_sk5.sketch, amount=-CUT_EXTRUDE2_REACH, mode=Mode.PRIVATE) & part.part
    # Sketch11 → Cut-Extrude2 (cut, up to next)
    with BuildSketch(Plane.ZY.offset(47.9913685), mode=Mode.PRIVATE) as cut_extrude2_sk6:
        with Locations((-5.467393779, 41.827764741)):
            Circle(SKETCH11_R)
    cut_extrude2_tool6 = extrude(cut_extrude2_sk6.sketch, amount=-CUT_EXTRUDE2_REACH, mode=Mode.PRIVATE) & part.part
    # Sketch11 → Cut-Extrude2 (cut, up to next)
    with BuildSketch(Plane.ZY.offset(47.9913685), mode=Mode.PRIVATE) as cut_extrude2_sk7:
        with Locations((5.532606221, 41.827764741)):
            Circle(SKETCH11_R)
    cut_extrude2_tool7 = extrude(cut_extrude2_sk7.sketch, amount=-CUT_EXTRUDE2_REACH, mode=Mode.PRIVATE) & part.part
    add(cut_extrude2_tool1.solids().sort_by_distance((-47.991369, 89.827765, 0.032606))[0], mode=Mode.SUBTRACT)
    add(cut_extrude2_tool2.solids().sort_by_distance((-47.991369, 66.827765, 0.032606))[0], mode=Mode.SUBTRACT)
    add(cut_extrude2_tool3.solids().sort_by_distance((-47.991369, 91.827765, -5.467394))[0], mode=Mode.SUBTRACT)
    add(cut_extrude2_tool4.solids().sort_by_distance((-47.991369, 91.827765, 5.532606))[0], mode=Mode.SUBTRACT)
    add(cut_extrude2_tool5.solids().sort_by_distance((-47.991369, 43.827765, 0.032606))[0], mode=Mode.SUBTRACT)
    add(cut_extrude2_tool6.solids().sort_by_distance((-47.991369, 41.827765, -5.467394))[0], mode=Mode.SUBTRACT)
    add(cut_extrude2_tool7.solids().sort_by_distance((-47.991369, 41.827765, 5.532606))[0], mode=Mode.SUBTRACT)


solid = part.part
